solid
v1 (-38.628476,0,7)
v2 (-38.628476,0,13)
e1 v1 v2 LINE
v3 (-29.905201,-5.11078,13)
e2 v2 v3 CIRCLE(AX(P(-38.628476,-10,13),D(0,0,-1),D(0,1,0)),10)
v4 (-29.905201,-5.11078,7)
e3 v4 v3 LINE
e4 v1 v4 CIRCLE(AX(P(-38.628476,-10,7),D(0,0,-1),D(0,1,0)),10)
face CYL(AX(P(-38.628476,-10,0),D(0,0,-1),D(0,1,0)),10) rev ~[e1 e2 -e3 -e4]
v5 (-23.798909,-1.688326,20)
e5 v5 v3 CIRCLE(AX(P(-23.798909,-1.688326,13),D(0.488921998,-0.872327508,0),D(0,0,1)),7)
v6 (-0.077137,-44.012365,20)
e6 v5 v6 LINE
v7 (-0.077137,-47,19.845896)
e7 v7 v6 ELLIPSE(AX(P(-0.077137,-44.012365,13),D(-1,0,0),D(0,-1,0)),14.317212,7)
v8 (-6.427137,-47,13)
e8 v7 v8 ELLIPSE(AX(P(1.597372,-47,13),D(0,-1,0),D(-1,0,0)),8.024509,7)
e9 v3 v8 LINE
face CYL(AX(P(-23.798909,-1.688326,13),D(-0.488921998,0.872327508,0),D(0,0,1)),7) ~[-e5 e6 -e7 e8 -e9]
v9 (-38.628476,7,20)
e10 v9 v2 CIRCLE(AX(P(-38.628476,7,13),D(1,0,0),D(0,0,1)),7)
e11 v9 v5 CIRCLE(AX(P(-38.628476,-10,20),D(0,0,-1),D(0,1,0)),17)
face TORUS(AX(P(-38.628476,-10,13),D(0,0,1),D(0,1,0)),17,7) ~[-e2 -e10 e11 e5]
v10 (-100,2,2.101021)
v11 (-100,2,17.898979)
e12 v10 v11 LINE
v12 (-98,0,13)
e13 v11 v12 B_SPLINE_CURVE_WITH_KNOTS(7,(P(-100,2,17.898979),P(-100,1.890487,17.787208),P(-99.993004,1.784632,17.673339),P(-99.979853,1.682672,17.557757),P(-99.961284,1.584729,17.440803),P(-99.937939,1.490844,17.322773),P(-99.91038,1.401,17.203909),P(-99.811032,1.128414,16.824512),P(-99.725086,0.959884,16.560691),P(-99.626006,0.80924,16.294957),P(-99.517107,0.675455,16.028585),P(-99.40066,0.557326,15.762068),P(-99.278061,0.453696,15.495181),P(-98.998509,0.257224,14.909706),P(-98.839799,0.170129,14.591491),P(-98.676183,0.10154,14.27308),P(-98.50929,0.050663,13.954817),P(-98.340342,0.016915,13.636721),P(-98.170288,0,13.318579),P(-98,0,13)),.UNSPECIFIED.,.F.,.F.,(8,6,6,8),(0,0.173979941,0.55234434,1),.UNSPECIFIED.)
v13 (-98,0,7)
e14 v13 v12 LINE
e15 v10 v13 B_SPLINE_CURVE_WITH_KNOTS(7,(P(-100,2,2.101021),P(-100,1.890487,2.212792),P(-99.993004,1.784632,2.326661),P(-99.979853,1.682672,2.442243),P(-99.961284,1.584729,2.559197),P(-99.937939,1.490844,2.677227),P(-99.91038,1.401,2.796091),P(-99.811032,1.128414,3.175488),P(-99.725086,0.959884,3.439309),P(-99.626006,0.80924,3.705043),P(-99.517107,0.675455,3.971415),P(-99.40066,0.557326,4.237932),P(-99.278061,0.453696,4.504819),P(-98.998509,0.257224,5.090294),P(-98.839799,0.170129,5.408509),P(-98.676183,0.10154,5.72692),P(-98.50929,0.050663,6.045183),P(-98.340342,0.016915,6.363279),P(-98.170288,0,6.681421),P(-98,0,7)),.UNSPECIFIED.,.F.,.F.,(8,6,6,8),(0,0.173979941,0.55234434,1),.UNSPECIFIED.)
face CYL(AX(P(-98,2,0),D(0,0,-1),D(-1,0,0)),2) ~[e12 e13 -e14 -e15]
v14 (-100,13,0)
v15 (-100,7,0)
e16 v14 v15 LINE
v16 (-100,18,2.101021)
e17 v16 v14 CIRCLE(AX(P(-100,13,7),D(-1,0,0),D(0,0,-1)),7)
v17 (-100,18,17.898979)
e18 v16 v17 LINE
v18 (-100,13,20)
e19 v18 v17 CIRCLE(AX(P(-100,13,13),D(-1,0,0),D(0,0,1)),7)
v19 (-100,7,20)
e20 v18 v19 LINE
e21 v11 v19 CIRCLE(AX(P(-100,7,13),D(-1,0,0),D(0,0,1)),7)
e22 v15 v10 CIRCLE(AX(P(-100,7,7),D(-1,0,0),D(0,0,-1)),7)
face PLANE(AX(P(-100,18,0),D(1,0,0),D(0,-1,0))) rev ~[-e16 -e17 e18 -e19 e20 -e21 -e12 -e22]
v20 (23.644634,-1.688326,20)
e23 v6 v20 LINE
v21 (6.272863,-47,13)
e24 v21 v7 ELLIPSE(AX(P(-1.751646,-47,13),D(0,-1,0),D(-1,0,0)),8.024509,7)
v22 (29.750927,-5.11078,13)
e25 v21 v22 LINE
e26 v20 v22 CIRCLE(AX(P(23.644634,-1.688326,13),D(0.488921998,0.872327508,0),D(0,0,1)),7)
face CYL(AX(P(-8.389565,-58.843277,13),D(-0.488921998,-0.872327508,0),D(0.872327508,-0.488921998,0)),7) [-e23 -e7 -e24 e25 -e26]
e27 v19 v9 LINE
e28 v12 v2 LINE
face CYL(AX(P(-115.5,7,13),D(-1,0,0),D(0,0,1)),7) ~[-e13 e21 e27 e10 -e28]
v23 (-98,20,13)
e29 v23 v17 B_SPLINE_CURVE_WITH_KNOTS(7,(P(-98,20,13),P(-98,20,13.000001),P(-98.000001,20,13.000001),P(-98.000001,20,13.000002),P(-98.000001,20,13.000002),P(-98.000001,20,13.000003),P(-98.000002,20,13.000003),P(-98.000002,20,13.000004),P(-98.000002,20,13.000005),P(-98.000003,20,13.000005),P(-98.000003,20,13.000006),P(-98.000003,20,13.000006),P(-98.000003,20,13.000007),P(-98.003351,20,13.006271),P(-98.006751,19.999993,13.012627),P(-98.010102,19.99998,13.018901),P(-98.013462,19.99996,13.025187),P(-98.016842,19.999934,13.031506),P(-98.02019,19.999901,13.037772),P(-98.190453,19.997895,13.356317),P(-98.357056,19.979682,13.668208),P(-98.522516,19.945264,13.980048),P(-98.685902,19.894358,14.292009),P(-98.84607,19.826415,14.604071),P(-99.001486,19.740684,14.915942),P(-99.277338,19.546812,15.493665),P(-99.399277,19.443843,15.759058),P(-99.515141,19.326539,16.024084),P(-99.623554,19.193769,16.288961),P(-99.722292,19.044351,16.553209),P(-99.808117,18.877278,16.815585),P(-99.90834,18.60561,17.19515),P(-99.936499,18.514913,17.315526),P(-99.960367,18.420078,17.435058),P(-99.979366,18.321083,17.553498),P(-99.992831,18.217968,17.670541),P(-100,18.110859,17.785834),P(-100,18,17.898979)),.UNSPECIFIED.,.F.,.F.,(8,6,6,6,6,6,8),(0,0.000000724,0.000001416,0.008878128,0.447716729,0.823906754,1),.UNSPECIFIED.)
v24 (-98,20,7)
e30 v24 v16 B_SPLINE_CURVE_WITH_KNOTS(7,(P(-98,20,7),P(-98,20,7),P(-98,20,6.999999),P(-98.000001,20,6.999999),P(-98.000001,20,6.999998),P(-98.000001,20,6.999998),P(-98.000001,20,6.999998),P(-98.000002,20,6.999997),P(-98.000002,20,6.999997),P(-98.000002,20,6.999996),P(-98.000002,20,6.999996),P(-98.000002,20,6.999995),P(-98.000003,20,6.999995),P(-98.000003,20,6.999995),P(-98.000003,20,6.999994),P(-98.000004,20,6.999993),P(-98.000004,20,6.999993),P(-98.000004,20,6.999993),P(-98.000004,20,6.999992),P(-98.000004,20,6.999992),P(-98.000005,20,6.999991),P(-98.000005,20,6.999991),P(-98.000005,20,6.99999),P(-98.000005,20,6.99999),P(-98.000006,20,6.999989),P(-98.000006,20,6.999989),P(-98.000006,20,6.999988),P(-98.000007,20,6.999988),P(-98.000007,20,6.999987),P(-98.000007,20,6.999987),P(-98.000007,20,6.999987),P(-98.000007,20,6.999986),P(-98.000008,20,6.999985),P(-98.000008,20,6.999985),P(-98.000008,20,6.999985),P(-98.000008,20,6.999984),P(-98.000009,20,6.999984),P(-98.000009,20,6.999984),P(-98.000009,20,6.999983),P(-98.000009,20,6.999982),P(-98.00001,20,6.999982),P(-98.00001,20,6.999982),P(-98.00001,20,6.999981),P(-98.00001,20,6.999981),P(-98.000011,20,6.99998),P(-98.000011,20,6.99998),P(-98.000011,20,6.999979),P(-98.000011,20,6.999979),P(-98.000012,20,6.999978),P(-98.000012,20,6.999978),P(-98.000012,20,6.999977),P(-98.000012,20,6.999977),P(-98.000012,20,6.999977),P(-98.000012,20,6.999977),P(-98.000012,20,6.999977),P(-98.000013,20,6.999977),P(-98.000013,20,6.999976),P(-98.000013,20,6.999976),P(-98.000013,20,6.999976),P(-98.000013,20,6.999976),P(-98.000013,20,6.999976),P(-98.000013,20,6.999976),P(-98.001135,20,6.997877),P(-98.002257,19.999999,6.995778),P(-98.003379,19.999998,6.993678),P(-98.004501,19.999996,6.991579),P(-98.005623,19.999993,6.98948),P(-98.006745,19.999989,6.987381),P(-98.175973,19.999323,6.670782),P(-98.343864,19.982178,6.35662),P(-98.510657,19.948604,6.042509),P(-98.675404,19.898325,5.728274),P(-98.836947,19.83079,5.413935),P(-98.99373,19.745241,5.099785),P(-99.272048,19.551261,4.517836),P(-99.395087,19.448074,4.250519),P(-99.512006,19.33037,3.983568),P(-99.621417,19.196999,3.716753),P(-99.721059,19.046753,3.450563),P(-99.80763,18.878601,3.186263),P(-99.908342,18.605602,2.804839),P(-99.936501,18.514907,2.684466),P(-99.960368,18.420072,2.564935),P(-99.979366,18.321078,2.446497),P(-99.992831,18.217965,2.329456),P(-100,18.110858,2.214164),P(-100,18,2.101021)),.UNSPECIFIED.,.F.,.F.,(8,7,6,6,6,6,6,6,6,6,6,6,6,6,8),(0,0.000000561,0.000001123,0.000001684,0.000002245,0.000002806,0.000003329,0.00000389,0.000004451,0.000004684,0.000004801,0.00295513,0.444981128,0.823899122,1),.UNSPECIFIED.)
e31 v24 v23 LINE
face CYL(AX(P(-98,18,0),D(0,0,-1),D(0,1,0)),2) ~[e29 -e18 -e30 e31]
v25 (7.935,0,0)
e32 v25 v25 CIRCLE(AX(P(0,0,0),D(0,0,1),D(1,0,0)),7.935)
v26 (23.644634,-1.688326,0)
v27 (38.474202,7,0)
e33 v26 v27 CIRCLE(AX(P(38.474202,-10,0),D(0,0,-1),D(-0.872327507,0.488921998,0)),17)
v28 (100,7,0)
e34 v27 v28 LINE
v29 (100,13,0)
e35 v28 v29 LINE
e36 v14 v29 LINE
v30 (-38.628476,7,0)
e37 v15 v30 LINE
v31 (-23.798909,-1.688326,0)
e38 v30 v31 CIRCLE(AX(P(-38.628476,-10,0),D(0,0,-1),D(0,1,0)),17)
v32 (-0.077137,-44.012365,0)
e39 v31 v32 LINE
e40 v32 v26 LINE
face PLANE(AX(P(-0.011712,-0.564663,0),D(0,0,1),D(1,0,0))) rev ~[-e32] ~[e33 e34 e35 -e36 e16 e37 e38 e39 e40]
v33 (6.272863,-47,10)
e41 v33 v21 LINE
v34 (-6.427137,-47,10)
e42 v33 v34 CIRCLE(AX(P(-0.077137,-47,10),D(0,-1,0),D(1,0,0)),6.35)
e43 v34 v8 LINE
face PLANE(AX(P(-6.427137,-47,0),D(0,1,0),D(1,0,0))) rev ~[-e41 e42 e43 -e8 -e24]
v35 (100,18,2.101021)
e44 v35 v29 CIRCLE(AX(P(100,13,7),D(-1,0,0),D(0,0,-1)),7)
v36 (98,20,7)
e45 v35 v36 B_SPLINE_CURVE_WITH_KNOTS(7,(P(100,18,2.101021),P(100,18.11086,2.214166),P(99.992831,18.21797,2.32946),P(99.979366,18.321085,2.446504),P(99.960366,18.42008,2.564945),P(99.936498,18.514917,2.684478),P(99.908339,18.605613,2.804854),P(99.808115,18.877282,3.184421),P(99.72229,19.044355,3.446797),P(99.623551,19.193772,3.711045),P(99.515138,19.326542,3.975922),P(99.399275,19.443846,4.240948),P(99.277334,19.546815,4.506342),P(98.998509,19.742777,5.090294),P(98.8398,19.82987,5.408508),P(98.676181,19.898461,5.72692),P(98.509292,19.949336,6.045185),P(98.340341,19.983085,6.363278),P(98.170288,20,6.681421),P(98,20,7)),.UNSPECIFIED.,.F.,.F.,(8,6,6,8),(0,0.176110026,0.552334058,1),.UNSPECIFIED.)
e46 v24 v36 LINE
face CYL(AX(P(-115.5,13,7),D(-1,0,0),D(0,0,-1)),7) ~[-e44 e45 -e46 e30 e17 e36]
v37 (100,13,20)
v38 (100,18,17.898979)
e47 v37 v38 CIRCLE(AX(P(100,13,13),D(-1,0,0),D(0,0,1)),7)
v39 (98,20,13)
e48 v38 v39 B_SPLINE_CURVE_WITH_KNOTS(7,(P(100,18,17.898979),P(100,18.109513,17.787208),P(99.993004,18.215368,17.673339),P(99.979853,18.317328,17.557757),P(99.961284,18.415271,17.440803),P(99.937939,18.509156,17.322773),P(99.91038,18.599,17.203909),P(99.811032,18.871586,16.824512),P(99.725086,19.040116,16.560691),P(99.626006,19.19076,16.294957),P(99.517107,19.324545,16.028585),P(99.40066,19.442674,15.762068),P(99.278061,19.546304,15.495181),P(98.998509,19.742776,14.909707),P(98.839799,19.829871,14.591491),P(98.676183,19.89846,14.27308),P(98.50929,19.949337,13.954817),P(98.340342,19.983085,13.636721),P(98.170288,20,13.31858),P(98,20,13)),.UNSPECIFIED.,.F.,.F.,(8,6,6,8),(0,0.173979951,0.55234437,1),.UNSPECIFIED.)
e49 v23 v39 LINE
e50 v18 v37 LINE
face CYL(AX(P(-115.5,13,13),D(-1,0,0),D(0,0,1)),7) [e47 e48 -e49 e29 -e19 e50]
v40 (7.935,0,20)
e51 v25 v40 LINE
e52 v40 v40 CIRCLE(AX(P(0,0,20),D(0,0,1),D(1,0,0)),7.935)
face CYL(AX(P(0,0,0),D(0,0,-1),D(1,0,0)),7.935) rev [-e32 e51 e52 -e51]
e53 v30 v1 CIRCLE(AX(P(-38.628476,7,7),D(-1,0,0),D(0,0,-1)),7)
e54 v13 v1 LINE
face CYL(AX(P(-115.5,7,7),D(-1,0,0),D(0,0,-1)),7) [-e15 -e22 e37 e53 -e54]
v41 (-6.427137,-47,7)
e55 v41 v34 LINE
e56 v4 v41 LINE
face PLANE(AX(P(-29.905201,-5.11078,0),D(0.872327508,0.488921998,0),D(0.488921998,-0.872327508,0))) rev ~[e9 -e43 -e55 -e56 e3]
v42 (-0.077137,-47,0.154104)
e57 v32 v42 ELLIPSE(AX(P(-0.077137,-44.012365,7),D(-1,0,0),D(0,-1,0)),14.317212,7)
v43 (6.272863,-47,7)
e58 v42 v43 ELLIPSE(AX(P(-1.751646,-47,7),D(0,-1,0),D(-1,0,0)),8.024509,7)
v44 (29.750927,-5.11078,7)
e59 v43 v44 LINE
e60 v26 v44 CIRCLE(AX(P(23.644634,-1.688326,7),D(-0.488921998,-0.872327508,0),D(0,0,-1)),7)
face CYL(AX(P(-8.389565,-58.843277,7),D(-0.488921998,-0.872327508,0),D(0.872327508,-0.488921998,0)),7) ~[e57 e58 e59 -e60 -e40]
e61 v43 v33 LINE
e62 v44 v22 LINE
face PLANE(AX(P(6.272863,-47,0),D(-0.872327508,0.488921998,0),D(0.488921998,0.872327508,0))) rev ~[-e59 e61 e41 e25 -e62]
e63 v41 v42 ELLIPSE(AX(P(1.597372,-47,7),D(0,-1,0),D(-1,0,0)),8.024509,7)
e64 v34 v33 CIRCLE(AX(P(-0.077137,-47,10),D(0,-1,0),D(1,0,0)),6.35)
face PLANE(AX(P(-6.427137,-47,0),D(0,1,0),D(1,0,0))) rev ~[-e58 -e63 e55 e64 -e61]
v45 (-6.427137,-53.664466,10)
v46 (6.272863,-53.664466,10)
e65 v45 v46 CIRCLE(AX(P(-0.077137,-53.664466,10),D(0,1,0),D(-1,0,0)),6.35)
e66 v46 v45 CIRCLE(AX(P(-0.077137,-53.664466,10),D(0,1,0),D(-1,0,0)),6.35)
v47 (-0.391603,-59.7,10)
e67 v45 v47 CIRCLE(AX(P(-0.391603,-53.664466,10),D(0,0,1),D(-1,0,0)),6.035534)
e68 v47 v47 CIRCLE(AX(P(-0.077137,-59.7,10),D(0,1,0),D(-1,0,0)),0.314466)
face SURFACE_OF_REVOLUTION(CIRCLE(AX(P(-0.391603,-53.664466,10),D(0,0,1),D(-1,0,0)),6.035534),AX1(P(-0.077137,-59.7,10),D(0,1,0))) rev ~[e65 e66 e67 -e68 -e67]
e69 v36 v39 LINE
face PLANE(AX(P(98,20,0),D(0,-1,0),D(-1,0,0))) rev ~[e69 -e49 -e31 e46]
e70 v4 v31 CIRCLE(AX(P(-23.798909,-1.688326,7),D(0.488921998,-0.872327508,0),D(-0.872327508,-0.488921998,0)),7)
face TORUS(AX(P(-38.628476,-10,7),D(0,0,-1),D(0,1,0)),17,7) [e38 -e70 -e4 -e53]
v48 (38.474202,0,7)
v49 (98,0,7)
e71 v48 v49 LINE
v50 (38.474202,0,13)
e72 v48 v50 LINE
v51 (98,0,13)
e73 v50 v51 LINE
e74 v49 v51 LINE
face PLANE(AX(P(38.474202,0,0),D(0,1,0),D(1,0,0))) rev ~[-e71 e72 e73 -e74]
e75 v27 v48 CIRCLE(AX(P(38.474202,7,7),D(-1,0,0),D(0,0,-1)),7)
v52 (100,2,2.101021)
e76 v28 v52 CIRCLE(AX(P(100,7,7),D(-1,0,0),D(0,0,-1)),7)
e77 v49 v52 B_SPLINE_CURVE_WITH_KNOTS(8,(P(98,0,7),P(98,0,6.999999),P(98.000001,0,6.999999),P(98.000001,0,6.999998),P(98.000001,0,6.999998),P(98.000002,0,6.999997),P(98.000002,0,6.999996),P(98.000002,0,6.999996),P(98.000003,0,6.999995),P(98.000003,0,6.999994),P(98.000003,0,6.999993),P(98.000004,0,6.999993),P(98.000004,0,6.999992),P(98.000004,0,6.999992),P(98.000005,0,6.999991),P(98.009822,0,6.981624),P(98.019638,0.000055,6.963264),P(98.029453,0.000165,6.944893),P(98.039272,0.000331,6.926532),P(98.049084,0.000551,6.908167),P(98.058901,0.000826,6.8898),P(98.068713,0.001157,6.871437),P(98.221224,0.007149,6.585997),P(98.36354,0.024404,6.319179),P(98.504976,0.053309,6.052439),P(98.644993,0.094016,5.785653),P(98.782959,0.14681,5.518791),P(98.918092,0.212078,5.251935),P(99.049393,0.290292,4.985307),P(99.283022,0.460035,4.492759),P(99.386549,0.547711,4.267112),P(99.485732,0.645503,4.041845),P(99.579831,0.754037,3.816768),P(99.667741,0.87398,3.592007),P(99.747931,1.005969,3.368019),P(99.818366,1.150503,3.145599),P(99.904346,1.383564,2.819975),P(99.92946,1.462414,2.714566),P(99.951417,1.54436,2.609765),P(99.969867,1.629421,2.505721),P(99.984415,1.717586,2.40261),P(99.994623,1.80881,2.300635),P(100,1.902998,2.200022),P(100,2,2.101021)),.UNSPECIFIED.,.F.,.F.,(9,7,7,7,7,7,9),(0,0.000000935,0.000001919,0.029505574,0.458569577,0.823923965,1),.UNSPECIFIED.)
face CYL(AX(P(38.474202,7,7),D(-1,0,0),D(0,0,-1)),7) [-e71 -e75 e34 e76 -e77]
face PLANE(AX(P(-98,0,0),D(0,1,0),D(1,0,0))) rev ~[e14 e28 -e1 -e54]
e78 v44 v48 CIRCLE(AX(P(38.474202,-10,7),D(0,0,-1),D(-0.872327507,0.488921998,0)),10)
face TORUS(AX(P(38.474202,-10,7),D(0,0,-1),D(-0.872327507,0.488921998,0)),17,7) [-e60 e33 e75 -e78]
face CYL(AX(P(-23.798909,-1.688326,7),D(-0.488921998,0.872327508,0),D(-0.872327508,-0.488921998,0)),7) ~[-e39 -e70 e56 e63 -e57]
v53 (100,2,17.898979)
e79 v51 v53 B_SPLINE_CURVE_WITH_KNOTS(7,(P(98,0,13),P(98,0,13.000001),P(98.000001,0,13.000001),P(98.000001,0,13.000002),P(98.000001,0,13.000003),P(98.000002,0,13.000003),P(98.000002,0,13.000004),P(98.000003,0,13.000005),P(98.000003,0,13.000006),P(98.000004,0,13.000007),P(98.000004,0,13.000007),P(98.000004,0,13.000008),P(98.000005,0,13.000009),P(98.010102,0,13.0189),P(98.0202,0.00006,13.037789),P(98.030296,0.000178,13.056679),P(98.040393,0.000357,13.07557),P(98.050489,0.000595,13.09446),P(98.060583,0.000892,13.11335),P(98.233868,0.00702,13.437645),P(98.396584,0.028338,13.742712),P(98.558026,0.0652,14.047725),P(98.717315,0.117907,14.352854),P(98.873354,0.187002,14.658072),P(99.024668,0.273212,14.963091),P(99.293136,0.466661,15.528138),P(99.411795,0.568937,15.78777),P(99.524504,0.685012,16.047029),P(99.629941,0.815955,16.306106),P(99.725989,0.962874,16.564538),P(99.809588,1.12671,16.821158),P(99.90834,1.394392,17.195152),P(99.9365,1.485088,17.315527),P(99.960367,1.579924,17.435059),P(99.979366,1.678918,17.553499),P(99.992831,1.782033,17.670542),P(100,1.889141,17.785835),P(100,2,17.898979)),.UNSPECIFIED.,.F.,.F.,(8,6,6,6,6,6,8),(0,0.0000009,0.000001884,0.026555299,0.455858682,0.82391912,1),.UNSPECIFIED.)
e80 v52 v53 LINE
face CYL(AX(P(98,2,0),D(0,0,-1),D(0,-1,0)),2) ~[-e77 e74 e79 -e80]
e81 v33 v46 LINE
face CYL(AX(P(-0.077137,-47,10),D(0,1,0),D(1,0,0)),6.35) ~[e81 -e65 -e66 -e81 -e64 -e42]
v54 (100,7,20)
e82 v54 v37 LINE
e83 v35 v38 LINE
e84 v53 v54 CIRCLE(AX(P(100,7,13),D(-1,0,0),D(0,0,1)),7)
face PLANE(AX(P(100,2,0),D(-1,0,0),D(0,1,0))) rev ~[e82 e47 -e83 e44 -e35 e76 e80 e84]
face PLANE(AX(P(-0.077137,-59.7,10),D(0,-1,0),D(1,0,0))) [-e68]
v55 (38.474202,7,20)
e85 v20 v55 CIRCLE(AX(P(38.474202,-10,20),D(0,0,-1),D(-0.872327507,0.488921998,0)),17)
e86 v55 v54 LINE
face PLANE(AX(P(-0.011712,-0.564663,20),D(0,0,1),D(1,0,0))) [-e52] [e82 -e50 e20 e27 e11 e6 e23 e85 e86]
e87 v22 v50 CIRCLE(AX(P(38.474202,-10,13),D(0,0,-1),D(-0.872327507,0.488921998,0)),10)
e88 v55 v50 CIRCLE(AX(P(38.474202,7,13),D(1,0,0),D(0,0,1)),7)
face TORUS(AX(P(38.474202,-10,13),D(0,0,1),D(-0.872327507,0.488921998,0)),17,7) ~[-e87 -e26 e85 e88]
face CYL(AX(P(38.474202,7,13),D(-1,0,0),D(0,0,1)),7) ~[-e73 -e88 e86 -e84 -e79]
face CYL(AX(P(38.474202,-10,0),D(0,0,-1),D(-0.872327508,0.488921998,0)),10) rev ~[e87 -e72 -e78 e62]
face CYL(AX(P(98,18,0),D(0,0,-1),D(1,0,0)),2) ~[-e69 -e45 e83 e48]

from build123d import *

# Parameters (mm, degrees)
F0_R         = 7.935
F1_DEPTH     = 20
F2_DEPTH     = 12.7
F4_DEPTH     = 12.7
F6_T1_DEPTH  = 77.0257979591
F6_T3_DEPTH  = 76.8715237662
F6_T5_DEPTH  = 231
F6_T8_ANGLE  = 60.7302478015
F6_T12_DEPTH = 65.5200608313
F6_T17_DEPTH = 65.5200608313
F6_T20_ANGLE = 60.7302478015
F6_T22_ANGLE = 60.7302478015
F6_T26_DEPTH = 65.5200608313
F6_T31_DEPTH = 65.5200608313
F6_T34_ANGLE = 60.7302478015


# Not quite as in the source:
# - a fillet or chamfer that OpenCascade refuses, or shapes differently, is made with other operations: its cross-section is extruded or revolved along the edge and cut away or added


with BuildPart() as f1:
    # F0 (on Top) → F1 (new body)
    with BuildSketch(Plane.XY):
        with BuildLine():
            Line((98, 20), (-98, 20))
            ThreePointArc((-98, 20), (-99.4142135624, 19.4142135624), (-100, 18))
            Line((-100, 18), (-100, 2))
            ThreePointArc((-100, 2), (-99.4142135624, 0.5857864376), (-98, 0))
            Line((-98, 0), (-38.6284762338, 0))
            ThreePointArc((-38.6284762338, 0), (-33.5733896743, -1.3717846645), (-29.9052011587, -5.1107800249))
            Line((-29.9052011587, -5.1107800249), (-6.4271370964, -47))
            Line((-6.4271370964, -47), (-6.4271370964, -59.7))
            Line((-6.4271370964, -59.7), (6.2728629036, -59.7))
            Line((6.2728629036, -59.7), (6.2728629036, -47))
            Line((6.2728629036, -47), (29.7509269659, -5.1107800249))
            ThreePointArc((29.7509269659, -5.1107800249), (33.4191154814, -1.3717846645), (38.4742020409, 0))
            Line((38.4742020409, 0), (98, 0))
            ThreePointArc((98, 0), (99.4142135624, 0.5857864376), (100, 2))
            Line((100, 2), (100, 18))
            ThreePointArc((100, 18), (99.4142135624, 19.4142135624), (98, 20))
        make_face()
        Circle(F0_R, mode=Mode.SUBTRACT)
    extrude(amount=F1_DEPTH)

    # F2 (cut): a face of the model
    f2_faces = [f1.faces().sort_by_distance(p)[0] for p in [
        (-0.0771370964, -59.7, 10),
    ]]
    extrude(f2_faces, amount=-F2_DEPTH, mode=Mode.SUBTRACT)

    # F3 (on face) → F4 (join)
    with BuildSketch(Plane.XZ.offset(47)):
        with BuildLine():
            ThreePointArc((-6.4271370964, 10), (-0.0771370964, 3.65), (6.2728629036, 10))
            ThreePointArc((6.2728629036, 10), (-0.0771370964, 16.35), (-6.4271370964, 10))
        make_face()
    extrude(amount=F4_DEPTH)

    # F5: fillet of radius 6.0355339059 on 1 edges, made by hand

    # F5_s1 → F5_t2 (revolve, cut)
    with BuildSketch(Plane.XY.offset(10)):
        with BuildLine():
            ThreePointArc((-6.4271370964, -53.6644660941), (-4.6593701435, -57.932233047), (-0.3916031905, -59.7))
            Line((-0.3916031905, -59.7), (-6.4271370964, -59.7))
            Line((-6.4271370964, -59.7), (-6.4271370964, -53.6644660941))
        make_face()
    revolve(axis=Axis((-0.0771370964, -59.7, 10), (0, 1, 0)), mode=Mode.SUBTRACT)

    # F6: fillet of radius 7 on 14 edges, made by hand

    # F6_s2 → F6_t1 (cut)
    with BuildSketch(Plane.YZ.offset(38.4742020409)):
        with BuildLine():
            ThreePointArc((7, 0), (2.0502525317, 2.0502525317), (0, 7))
            Line((0, 7), (0, 0))
            Line((0, 0), (7, 0))
        make_face()
        with BuildLine():
            ThreePointArc((7, 20), (2.0502525317, 17.9497474683), (0, 13))
            Line((0, 13), (0, 20))
            Line((0, 20), (7, 20))
        make_face()
    extrude(amount=F6_T1_DEPTH, mode=Mode.SUBTRACT)

    # F6_s4 → F6_t3 (cut)
    with BuildSketch(Plane.YZ.offset(-115.5)):
        with BuildLine():
            ThreePointArc((7, 0), (2.0502525317, 2.0502525317), (0, 7))
            Line((0, 7), (0, 0))
            Line((0, 0), (7, 0))
        make_face()
        with BuildLine():
            ThreePointArc((7, 20), (2.0502525317, 17.9497474683), (0, 13))
            Line((0, 13), (0, 20))
            Line((0, 20), (7, 20))
        make_face()
    extrude(amount=F6_T3_DEPTH, mode=Mode.SUBTRACT)

    # F6_s6 → F6_t5 (cut)
    with BuildSketch(Plane.YZ.offset(-115.5)):
        with BuildLine():
            ThreePointArc((13, 0), (17.9497474683, 2.0502525317), (20, 7))
            Line((20, 7), (20, 0))
            Line((20, 0), (13, 0))
        make_face()
        with BuildLine():
            ThreePointArc((13, 20), (17.9497474683, 17.9497474683), (20, 13))
            Line((20, 13), (20, 20))
            Line((20, 20), (13, 20))
        make_face()
    extrude(amount=F6_T5_DEPTH, mode=Mode.SUBTRACT)

    # F6_s7 → F6_t8 (revolve, cut)
    with BuildSketch(Plane(origin=(4.9320537662, 8.7996985012, 0), x_dir=(0, 0, 1), z_dir=(-0.4889219975, -0.8723275075, 0))):
        with BuildLine():
            ThreePointArc((0, -21.4513247447), (2.0502525317, -26.401072213), (7, -28.4513247447))
            Line((7, -28.4513247447), (0, -28.4513247447))
            Line((0, -28.4513247447), (0, -21.4513247447))
        make_face()
    revolve(axis=Axis((38.4742020409, -10, 0), (0, 0, -1)), revolution_arc=F6_T8_ANGLE, mode=Mode.SUBTRACT)


with BuildPart() as f6_tool10:
    # F6_s11 → F6_t12 (new body)
    with BuildSketch(Plane(origin=(-27.1021452526, -48.3552528553, 0), x_dir=(0, 0, 1), z_dir=(0.4889219975, 0.8723275075, 0))):
        with BuildLine():
            ThreePointArc((7, 28.4513247447), (2.0502525317, 26.401072213), (0, 21.4513247447))
            Line((0, 21.4513247447), (0, 28.4513247447))
            Line((0, 28.4513247447), (7, 28.4513247447))
        make_face()
    extrude(amount=F6_T12_DEPTH)

    split(bisect_by=Plane.XZ.offset(47), keep=Keep.BOTTOM)


with BuildPart() as f1_1:
    add(f1.part)

    # F6_t9: cut F6_tool10
    add(f6_tool10.part, mode=Mode.SUBTRACT)


with BuildPart() as f6_tool15:
    # F6_s16 → F6_t17 (new body)
    with BuildSketch(Plane(origin=(-4.9689321973, 8.865496461, 0), x_dir=(0, 0, 1), z_dir=(0.4889219975, -0.8723275075, 0))):
        with BuildLine():
            ThreePointArc((7, 28.5859023668), (2.0502525317, 26.5356498351), (0, 21.5859023668))
            Line((0, 21.5859023668), (0, 28.5859023668))
            Line((0, 28.5859023668), (7, 28.5859023668))
        make_face()
    extrude(amount=F6_T17_DEPTH)

    split(bisect_by=Plane.XZ.offset(47), keep=Keep.BOTTOM)


with BuildPart() as f1_2:
    add(f1_1.part)

    # F6_t14: cut F6_tool15
    add(f6_tool15.part, mode=Mode.SUBTRACT)

    # F6_s19 → F6_t20 (revolve, cut)
    with BuildSketch(Plane.YZ.offset(-38.6284762338)):
        with BuildLine():
            ThreePointArc((7, 0), (2.0502525317, 2.0502525317), (0, 7))
            Line((0, 7), (0, 0))
            Line((0, 0), (7, 0))
        make_face()
    revolve(axis=Axis((-38.6284762338, -10, 0), (0, 0, -1)), revolution_arc=F6_T20_ANGLE, mode=Mode.SUBTRACT)

    # F6_s21 → F6_t22 (revolve, cut)
    with BuildSketch(Plane(origin=(4.9320537662, 8.7996985012, 0), x_dir=(0, 0, 1), z_dir=(-0.4889219975, -0.8723275075, 0))):
        with BuildLine():
            ThreePointArc((20, -21.4513247447), (17.9497474683, -26.401072213), (13, -28.4513247447))
            Line((13, -28.4513247447), (20, -28.4513247447))
            Line((20, -28.4513247447), (20, -21.4513247447))
        make_face()
    revolve(axis=Axis((38.4742020409, -10, 20), (0, 0, -1)), revolution_arc=F6_T22_ANGLE, mode=Mode.SUBTRACT)


with BuildPart() as f6_tool24:
    # F6_s25 → F6_t26 (new body)
    with BuildSketch(Plane(origin=(-27.1021452526, -48.3552528553, 0), x_dir=(0, 0, 1), z_dir=(0.4889219975, 0.8723275075, 0))):
        with BuildLine():
            ThreePointArc((13, 28.4513247447), (17.9497474683, 26.401072213), (20, 21.4513247447))
            Line((20, 21.4513247447), (20, 28.4513247447))
            Line((20, 28.4513247447), (13, 28.4513247447))
        make_face()
    extrude(amount=F6_T26_DEPTH)

    split(bisect_by=Plane.XZ.offset(47), keep=Keep.BOTTOM)


with BuildPart() as f1_3:
    add(f1_2.part)

    # F6_t23: cut F6_tool24
    add(f6_tool24.part, mode=Mode.SUBTRACT)


with BuildPart() as f6_tool29:
    # F6_s30 → F6_t31 (new body)
    with BuildSketch(Plane(origin=(-4.9689321973, 8.865496461, 0), x_dir=(0, 0, 1), z_dir=(0.4889219975, -0.8723275075, 0))):
        with BuildLine():
            ThreePointArc((20, 21.5859023668), (17.9497474683, 26.5356498351), (13, 28.5859023668))
            Line((13, 28.5859023668), (20, 28.5859023668))
            Line((20, 28.5859023668), (20, 21.5859023668))
        make_face()
    extrude(amount=F6_T31_DEPTH)

    split(bisect_by=Plane.XZ.offset(47), keep=Keep.BOTTOM)


with BuildPart() as f1_4:
    add(f1_3.part)

    # F6_t28: cut F6_tool29
    add(f6_tool29.part, mode=Mode.SUBTRACT)

    # F6_s33 → F6_t34 (revolve, cut)
    with BuildSketch(Plane.YZ.offset(-38.6284762338)):
        with BuildLine():
            ThreePointArc((7, 20), (2.0502525317, 17.9497474683), (0, 13))
            Line((0, 13), (0, 20))
            Line((0, 20), (7, 20))
        make_face()
    revolve(axis=Axis((-38.6284762338, -10, 20), (0, 0, -1)), revolution_arc=F6_T34_ANGLE, mode=Mode.SUBTRACT)


solid = f1_4.part
